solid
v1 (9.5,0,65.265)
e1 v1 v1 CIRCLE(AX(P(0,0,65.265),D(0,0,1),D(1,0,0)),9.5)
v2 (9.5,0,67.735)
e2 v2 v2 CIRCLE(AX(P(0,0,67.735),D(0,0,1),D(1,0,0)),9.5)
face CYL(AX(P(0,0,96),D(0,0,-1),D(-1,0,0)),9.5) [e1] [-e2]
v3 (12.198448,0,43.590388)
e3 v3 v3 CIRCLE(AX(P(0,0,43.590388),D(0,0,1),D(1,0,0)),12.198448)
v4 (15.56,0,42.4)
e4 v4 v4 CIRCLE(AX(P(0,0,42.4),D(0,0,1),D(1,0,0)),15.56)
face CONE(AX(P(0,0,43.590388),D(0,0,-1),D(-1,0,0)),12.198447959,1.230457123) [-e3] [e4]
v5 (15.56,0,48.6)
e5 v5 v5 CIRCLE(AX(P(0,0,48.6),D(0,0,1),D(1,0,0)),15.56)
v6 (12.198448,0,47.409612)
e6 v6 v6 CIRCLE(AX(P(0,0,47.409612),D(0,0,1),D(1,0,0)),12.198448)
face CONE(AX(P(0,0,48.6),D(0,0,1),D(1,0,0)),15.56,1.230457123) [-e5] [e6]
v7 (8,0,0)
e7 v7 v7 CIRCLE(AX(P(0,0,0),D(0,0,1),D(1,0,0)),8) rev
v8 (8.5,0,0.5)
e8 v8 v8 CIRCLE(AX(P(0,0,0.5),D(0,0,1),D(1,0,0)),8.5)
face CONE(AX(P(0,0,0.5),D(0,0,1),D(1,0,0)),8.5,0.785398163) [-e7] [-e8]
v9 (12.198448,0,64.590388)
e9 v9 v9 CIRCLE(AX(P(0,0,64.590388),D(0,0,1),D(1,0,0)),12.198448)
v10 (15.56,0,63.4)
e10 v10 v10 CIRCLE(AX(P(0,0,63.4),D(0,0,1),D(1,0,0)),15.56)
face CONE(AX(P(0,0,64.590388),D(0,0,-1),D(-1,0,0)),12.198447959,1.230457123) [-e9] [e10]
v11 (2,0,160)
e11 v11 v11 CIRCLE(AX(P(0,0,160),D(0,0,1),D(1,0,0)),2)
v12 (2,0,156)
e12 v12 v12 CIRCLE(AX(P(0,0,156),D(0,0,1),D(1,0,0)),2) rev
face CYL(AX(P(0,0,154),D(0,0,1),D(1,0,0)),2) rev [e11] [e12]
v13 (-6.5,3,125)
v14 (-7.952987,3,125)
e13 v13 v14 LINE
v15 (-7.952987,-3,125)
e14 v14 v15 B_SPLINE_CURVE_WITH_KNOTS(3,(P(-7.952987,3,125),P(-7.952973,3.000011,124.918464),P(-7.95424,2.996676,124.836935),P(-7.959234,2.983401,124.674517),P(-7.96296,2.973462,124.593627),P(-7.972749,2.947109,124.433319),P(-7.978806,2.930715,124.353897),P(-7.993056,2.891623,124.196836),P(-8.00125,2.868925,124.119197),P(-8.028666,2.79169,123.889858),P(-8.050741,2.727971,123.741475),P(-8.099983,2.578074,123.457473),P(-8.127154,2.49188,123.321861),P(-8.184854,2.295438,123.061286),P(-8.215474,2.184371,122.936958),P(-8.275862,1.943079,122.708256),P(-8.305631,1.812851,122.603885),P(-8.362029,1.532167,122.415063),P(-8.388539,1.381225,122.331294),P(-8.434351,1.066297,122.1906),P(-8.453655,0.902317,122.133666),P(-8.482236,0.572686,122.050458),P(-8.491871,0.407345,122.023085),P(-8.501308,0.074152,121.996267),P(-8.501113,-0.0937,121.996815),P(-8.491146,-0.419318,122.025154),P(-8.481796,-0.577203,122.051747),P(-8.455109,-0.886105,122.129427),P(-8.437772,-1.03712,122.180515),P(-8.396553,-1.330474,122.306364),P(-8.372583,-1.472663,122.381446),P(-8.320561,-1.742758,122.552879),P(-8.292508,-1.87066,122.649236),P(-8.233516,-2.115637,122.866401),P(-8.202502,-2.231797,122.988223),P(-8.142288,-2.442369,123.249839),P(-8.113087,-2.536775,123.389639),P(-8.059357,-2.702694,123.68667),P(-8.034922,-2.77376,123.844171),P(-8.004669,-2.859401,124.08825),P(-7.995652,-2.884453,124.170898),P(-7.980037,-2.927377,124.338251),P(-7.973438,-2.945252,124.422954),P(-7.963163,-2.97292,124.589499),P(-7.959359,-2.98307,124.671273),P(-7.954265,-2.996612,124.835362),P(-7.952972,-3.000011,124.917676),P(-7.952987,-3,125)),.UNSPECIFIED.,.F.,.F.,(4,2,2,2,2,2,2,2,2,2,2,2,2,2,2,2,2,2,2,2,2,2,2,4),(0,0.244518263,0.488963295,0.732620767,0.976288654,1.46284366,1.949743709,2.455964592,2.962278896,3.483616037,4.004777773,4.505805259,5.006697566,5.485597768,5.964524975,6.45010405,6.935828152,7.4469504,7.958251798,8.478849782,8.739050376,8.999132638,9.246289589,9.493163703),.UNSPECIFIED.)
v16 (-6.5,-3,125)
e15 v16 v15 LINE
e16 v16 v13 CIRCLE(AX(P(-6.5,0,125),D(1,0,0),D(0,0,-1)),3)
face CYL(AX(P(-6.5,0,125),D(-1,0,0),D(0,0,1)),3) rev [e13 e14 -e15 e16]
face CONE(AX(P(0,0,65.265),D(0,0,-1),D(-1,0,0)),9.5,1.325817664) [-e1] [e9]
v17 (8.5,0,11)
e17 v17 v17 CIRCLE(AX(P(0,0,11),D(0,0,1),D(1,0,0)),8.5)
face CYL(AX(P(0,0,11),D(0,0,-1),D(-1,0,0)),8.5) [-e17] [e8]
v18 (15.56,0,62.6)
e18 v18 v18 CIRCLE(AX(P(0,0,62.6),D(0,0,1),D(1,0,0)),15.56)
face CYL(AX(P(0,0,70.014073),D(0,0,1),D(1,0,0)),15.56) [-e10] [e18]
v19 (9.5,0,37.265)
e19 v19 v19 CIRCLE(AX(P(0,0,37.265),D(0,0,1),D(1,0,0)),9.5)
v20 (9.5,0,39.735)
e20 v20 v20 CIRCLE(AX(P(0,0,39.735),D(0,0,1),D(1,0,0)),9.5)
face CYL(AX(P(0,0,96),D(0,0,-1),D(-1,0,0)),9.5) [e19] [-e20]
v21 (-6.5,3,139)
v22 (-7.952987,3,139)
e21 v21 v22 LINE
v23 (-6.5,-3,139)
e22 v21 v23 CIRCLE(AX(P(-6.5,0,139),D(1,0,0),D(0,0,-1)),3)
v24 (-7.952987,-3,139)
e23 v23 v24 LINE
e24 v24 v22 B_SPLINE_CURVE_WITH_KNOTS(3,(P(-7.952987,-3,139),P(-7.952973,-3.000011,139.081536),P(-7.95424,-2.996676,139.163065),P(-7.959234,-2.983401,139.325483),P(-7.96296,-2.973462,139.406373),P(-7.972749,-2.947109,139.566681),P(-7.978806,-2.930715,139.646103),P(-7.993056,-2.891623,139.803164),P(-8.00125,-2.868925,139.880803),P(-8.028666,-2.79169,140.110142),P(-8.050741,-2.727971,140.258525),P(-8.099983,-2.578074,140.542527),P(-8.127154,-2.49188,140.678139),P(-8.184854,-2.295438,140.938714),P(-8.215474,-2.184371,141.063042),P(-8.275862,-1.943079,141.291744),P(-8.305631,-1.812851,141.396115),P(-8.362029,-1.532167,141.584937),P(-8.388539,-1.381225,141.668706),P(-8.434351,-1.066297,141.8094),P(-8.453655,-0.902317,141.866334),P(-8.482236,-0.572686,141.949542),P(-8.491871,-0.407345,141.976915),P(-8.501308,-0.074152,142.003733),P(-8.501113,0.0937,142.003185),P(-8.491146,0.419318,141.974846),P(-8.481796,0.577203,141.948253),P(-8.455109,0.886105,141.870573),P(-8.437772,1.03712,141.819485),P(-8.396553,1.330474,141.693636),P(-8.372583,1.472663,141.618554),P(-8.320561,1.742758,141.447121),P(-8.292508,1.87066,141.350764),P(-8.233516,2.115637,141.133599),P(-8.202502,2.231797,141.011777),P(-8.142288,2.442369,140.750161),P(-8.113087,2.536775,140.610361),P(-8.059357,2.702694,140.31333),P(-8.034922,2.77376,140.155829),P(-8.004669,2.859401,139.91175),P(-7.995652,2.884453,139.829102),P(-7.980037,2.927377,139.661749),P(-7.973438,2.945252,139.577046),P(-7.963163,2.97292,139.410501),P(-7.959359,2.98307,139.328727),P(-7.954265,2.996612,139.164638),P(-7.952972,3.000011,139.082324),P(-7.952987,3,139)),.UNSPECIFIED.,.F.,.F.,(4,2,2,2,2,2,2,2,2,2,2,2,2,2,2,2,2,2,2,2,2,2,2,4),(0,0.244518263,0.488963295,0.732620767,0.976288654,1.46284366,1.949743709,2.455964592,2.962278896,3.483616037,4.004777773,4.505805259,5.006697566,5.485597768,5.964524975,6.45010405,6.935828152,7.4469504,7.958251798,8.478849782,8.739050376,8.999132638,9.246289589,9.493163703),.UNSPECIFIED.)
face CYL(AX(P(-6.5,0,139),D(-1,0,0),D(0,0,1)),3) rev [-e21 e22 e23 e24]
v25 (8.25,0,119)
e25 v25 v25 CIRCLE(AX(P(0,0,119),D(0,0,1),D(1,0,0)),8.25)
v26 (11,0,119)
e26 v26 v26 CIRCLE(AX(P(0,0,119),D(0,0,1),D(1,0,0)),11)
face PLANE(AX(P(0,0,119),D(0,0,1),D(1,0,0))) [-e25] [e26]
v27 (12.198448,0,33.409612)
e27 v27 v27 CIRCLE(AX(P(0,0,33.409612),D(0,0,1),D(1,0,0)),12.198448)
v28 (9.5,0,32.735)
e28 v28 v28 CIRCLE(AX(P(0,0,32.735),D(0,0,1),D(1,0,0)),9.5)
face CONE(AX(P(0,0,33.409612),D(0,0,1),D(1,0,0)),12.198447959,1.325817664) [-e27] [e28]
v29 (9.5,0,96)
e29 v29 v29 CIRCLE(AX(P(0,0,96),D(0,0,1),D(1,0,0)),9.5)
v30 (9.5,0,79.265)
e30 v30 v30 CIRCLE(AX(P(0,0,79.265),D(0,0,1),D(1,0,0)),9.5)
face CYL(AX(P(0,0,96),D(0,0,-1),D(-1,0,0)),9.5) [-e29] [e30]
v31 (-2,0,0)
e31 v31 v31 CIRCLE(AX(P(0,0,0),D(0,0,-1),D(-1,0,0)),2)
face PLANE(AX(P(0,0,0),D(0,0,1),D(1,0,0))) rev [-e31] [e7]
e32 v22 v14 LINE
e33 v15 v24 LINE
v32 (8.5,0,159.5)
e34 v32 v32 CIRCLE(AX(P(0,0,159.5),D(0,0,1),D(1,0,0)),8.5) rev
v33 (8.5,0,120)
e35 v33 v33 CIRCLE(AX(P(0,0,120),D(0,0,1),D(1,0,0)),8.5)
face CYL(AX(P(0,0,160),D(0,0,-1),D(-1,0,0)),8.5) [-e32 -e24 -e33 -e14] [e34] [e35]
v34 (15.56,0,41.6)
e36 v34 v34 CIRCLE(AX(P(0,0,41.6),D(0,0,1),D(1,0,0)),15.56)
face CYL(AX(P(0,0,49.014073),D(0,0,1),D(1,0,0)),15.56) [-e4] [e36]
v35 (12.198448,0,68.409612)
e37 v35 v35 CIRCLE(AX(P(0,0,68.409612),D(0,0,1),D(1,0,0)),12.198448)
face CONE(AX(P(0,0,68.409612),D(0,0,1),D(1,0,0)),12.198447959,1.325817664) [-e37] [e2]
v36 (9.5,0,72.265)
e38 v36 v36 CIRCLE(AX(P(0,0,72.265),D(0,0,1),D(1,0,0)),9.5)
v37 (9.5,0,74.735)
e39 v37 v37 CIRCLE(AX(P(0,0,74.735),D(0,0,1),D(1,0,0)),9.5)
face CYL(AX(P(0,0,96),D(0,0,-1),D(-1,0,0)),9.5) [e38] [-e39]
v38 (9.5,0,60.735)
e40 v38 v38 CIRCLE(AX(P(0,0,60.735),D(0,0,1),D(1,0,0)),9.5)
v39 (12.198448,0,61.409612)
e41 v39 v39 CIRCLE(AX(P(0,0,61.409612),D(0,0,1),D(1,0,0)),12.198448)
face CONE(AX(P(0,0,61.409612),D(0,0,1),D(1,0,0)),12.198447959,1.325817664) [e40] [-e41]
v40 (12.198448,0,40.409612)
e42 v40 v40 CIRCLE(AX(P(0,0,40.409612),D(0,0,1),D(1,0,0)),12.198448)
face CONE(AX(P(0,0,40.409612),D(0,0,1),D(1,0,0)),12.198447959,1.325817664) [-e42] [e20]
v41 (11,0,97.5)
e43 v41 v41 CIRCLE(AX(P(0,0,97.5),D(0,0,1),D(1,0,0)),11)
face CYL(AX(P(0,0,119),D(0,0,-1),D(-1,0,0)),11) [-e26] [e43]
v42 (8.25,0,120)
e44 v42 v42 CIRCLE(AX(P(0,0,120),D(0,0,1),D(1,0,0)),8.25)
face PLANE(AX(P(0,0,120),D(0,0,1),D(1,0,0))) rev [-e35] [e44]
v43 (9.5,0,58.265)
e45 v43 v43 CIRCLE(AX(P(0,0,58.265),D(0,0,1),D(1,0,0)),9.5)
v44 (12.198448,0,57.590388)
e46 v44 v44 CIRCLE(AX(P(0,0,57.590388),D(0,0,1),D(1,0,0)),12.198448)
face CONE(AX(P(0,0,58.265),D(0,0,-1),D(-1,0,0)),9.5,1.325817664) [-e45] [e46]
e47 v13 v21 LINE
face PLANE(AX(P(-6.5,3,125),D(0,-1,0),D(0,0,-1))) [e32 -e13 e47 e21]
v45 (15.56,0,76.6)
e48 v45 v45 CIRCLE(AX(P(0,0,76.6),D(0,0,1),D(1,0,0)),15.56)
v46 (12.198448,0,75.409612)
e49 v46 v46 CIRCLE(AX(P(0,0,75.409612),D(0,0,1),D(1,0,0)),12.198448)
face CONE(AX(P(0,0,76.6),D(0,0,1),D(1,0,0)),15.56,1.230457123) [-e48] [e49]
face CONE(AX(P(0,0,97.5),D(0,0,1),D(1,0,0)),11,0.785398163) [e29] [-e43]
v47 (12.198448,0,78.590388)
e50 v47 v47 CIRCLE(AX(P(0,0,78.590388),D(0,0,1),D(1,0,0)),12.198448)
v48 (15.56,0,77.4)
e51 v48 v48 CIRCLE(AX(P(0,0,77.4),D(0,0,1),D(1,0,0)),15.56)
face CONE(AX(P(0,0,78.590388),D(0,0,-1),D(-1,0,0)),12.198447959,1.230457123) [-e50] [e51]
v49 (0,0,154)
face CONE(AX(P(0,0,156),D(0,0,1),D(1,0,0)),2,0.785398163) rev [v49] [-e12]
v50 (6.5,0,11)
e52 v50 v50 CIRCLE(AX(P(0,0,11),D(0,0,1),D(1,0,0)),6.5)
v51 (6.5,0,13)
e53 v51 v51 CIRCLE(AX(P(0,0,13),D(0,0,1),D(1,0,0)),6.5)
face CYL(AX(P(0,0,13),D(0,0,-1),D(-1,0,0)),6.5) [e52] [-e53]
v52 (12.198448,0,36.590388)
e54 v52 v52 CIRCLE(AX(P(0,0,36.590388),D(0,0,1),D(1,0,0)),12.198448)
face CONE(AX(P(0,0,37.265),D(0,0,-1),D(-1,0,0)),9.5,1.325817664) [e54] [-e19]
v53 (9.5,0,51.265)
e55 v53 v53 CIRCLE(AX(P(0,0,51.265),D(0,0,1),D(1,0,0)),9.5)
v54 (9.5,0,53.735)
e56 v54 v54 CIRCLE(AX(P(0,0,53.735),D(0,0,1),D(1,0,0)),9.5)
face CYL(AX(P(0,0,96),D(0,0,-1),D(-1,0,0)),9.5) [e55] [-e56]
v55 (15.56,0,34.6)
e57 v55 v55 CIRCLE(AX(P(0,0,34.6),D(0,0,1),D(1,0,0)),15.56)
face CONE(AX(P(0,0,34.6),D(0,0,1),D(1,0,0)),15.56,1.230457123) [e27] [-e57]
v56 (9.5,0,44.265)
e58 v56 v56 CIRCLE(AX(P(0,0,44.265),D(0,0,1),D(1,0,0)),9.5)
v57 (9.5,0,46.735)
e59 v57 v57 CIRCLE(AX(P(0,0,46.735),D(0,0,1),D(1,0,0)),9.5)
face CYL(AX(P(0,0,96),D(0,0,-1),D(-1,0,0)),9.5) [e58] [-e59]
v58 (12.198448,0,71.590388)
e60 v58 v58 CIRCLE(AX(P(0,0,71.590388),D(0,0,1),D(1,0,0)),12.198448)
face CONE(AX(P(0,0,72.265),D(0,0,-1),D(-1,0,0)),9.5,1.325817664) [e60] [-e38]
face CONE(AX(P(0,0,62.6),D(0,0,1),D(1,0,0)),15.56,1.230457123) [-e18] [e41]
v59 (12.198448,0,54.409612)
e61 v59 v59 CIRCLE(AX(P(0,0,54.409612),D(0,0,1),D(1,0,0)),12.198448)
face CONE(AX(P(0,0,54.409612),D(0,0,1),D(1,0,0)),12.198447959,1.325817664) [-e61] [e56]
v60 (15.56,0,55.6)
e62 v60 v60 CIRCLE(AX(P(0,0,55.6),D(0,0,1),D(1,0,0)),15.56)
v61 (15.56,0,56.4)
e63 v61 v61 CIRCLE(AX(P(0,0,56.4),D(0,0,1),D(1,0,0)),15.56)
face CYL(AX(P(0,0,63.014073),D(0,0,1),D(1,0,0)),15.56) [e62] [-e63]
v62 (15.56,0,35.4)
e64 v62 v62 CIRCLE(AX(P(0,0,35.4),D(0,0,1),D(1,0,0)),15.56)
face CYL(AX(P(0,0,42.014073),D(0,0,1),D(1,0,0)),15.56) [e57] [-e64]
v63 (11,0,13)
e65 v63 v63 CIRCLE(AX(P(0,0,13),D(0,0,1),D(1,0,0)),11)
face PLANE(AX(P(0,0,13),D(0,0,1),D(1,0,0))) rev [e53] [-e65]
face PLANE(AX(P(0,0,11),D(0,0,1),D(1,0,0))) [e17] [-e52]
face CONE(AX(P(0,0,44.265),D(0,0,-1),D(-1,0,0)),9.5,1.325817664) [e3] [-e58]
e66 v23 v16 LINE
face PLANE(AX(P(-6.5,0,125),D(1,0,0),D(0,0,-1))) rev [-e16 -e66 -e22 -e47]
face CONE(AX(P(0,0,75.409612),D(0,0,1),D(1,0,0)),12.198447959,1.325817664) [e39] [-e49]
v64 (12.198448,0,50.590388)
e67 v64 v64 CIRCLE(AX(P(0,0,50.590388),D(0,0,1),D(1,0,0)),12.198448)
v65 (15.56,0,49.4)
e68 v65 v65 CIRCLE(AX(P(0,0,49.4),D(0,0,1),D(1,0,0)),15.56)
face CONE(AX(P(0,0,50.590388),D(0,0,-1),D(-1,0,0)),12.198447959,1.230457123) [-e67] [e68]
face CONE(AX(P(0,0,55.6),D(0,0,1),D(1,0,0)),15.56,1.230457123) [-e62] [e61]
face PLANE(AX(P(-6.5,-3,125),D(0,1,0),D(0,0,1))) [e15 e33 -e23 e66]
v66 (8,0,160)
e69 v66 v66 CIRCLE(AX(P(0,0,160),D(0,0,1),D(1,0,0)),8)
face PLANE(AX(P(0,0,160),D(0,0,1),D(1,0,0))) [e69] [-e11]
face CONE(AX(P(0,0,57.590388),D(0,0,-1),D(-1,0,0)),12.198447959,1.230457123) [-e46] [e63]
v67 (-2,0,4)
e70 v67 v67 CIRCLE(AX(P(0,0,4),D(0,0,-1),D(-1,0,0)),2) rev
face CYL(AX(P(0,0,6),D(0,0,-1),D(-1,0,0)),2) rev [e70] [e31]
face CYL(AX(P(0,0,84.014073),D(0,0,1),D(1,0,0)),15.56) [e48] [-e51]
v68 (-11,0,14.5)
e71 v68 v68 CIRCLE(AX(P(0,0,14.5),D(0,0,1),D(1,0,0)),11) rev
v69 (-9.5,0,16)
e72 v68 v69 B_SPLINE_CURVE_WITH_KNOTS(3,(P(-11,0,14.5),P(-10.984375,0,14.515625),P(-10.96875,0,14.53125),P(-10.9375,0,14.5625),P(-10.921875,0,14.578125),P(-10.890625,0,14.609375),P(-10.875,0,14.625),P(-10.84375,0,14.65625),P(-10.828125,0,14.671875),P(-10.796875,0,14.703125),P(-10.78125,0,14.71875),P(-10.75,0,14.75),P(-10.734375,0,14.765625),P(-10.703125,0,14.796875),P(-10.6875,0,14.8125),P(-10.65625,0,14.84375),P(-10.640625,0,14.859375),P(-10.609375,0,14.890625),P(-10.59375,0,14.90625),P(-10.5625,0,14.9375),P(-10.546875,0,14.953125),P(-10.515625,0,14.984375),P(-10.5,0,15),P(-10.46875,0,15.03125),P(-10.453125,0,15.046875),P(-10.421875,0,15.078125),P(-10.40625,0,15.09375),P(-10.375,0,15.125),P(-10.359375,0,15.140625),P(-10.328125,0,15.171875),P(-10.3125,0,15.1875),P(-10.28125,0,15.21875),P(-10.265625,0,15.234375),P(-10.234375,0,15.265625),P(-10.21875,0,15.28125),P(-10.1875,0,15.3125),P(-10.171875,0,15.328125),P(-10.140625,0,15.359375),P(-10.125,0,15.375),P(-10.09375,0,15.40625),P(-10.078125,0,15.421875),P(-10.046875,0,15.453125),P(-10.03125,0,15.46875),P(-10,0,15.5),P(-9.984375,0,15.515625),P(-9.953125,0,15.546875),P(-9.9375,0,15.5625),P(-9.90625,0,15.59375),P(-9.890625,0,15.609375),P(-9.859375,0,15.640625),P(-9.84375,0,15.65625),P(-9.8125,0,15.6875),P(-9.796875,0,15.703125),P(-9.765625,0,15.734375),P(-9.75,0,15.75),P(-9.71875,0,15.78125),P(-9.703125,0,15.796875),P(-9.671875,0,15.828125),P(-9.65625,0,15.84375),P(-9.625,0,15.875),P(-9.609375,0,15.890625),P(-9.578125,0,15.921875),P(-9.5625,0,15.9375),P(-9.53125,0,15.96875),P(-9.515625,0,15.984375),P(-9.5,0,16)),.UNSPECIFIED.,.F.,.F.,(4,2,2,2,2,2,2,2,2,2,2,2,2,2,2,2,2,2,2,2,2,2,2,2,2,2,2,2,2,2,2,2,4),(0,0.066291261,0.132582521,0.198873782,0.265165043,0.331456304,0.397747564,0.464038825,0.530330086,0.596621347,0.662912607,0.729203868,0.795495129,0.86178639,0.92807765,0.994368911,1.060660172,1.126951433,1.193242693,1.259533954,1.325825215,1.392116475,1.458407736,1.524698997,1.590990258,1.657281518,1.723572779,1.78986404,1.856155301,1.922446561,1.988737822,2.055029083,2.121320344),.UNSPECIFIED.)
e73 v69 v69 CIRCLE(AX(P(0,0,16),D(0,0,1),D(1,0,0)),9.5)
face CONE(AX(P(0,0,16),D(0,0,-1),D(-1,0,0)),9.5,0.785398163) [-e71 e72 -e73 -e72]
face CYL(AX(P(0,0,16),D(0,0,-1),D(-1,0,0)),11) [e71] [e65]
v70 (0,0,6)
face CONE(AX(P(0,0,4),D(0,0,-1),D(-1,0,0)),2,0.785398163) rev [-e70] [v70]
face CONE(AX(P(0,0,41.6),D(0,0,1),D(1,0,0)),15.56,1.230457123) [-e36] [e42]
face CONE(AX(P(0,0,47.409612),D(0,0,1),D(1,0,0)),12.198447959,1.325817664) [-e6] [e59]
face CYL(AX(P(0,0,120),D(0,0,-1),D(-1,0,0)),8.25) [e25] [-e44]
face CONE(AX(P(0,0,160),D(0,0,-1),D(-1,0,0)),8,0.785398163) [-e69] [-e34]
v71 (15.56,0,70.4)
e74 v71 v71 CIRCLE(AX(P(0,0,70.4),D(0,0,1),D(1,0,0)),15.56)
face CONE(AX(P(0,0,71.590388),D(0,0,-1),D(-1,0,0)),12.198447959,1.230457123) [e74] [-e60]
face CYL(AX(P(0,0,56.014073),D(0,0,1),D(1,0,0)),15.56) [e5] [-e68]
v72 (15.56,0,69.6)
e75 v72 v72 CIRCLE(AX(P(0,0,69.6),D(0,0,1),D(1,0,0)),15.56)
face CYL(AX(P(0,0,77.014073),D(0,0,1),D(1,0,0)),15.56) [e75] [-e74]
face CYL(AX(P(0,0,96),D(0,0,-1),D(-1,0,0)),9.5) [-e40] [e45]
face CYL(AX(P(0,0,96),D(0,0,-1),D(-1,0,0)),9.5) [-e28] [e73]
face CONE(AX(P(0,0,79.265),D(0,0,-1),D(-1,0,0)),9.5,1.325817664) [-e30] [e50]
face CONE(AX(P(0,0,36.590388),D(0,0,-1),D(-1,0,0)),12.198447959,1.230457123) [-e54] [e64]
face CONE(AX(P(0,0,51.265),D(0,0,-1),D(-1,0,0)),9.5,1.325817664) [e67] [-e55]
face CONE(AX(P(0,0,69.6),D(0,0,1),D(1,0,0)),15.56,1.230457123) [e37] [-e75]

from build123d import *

# Parameters (mm, degrees)
SKETCH1_R       = 8.5
EXTRUDE1_DEPTH  = 11
SKETCH2_R       = 6.5
EXTRUDE2_DEPTH  = 2
SKETCH3_R       = 11
EXTRUDE3_DEPTH  = 3
SKETCH4_R       = 9.5
EXTRUDE4_DEPTH  = 80
SKETCH5_R       = 11
EXTRUDE5_DEPTH  = 23
SKETCH6_R       = 8.25
EXTRUDE6_DEPTH  = 1
SKETCH7_R       = 8.5
EXTRUDE7_DEPTH  = 40
CHAMFER1_SIZE   = 0.5
CHAMFER2_SIZE   = 1.5
SKETCH8_R       = 2
EXTRUDE8_DEPTH  = 6
CHAMFER3_SIZE   = 2
EXTRUDE9_START  = -6
SKETCH9_R       = 2
EXTRUDE9_DEPTH  = 6
CHAMFER4_SIZE   = 2
EXTRUDE11_DEPTH = 2
LPATTERN1_COUNT = 7
LPATTERN1_PITCH = 7


with BuildPart() as part:
    # Sketch1 → Extrude1 (new body)
    with BuildSketch(Plane.XY):
        Circle(SKETCH1_R)
    extrude(amount=EXTRUDE1_DEPTH)

    # Sketch2 → Extrude2 (add)
    with BuildSketch(Plane.XY.offset(11)):
        Circle(SKETCH2_R)
    extrude(amount=EXTRUDE2_DEPTH)

    # Sketch3 → Extrude3 (add)
    with BuildSketch(Plane.XY.offset(13)):
        Circle(SKETCH3_R)
    extrude(amount=EXTRUDE3_DEPTH)

    # Sketch4 → Extrude4 (add)
    with BuildSketch(Plane.XY.offset(16)):
        Circle(SKETCH4_R)
    extrude(amount=EXTRUDE4_DEPTH)

    # Sketch5 → Extrude5 (add)
    with BuildSketch(Plane.XY.offset(96)):
        Circle(SKETCH5_R)
    extrude(amount=EXTRUDE5_DEPTH)

    # Sketch6 → Extrude6 (add)
    with BuildSketch(Plane.XY.offset(119)):
        Circle(SKETCH6_R)
    extrude(amount=EXTRUDE6_DEPTH)

    # Sketch7 → Extrude7 (add)
    with BuildSketch(Plane.XY.offset(120)):
        Circle(SKETCH7_R)
    extrude(amount=EXTRUDE7_DEPTH)

    # Chamfer1
    chamfer1_edges = [part.edges().sort_by_distance(p)[0] for p in [
        (-8.5, 0, 0),
        (-8.5, 0, 160),
    ]]
    chamfer(chamfer1_edges, length=CHAMFER1_SIZE)

    # Chamfer2
    chamfer2_edges = [part.edges().sort_by_distance(p)[0] for p in [
        (-11, 0, 96),
        (-11, 0, 16),
    ]]
    chamfer(chamfer2_edges, length=CHAMFER2_SIZE - 0.0001)  # a hair under: the kernel refuses the full size

    # Sketch8 → Extrude8 (cut)
    with BuildSketch(Plane.XY.offset(160)):
        Circle(SKETCH8_R)
    extrude(amount=-EXTRUDE8_DEPTH, mode=Mode.SUBTRACT)

    # Chamfer3
    chamfer3_edges = [part.edges().sort_by_distance(p)[0] for p in [
        (-2, 0, 154),
    ]]
    chamfer(chamfer3_edges, length=CHAMFER3_SIZE)

    # Sketch9 → Extrude9 (cut)
    with BuildSketch(Plane(origin=(0, 0, 0), x_dir=(-1, 0, 0), z_dir=(0, 0, -1)).offset(EXTRUDE9_START)):
        with Locations(Location((0, 0, 0), (0, 0, 180))):
            Circle(SKETCH9_R)
    extrude(amount=EXTRUDE9_DEPTH, mode=Mode.SUBTRACT)

    # Chamfer4
    chamfer4_edges = [part.edges().sort_by_distance(p)[0] for p in [
        (-2, 0, 6),
    ]]
    chamfer(chamfer4_edges, length=CHAMFER4_SIZE)

    # Sketch10 → Extrude11 (cut)
    with BuildSketch(Plane(origin=(-8.5, 0, 0), x_dir=(0, 0, -1), z_dir=(1, 0, 0))):
        with BuildLine():
            Line((-125, -3), (-139, -3))
            ThreePointArc((-139, -3), (-142, 0), (-139, 3))
            Line((-139, 3), (-125, 3))
            ThreePointArc((-125, 3), (-122, 0), (-125, -3))
        make_face()
    extrude(amount=EXTRUDE11_DEPTH, mode=Mode.SUBTRACT)

    # Sketch11 → Revolve1 (revolve)
    with BuildSketch(Plane(origin=(0, 0, 0), x_dir=(1, 0, 0), z_dir=(0, 1, 0))):
        Polygon((9.5, -79.265), (9.5, -74.735), (12.198447959, -75.40961199), (15.56, -76.6), (15.56, -77.4), (12.198447959, -78.59038801), align=None)
    revolve1 = revolve(axis=Axis((0, 0, 84.014072954), (0, 0, -1)))

    # LPattern1: Revolve1 ×7
    with Locations(*[(0, 0, -i * LPATTERN1_PITCH) for i in range(1, LPATTERN1_COUNT)]):
        add(revolve1)


solid = part.part
